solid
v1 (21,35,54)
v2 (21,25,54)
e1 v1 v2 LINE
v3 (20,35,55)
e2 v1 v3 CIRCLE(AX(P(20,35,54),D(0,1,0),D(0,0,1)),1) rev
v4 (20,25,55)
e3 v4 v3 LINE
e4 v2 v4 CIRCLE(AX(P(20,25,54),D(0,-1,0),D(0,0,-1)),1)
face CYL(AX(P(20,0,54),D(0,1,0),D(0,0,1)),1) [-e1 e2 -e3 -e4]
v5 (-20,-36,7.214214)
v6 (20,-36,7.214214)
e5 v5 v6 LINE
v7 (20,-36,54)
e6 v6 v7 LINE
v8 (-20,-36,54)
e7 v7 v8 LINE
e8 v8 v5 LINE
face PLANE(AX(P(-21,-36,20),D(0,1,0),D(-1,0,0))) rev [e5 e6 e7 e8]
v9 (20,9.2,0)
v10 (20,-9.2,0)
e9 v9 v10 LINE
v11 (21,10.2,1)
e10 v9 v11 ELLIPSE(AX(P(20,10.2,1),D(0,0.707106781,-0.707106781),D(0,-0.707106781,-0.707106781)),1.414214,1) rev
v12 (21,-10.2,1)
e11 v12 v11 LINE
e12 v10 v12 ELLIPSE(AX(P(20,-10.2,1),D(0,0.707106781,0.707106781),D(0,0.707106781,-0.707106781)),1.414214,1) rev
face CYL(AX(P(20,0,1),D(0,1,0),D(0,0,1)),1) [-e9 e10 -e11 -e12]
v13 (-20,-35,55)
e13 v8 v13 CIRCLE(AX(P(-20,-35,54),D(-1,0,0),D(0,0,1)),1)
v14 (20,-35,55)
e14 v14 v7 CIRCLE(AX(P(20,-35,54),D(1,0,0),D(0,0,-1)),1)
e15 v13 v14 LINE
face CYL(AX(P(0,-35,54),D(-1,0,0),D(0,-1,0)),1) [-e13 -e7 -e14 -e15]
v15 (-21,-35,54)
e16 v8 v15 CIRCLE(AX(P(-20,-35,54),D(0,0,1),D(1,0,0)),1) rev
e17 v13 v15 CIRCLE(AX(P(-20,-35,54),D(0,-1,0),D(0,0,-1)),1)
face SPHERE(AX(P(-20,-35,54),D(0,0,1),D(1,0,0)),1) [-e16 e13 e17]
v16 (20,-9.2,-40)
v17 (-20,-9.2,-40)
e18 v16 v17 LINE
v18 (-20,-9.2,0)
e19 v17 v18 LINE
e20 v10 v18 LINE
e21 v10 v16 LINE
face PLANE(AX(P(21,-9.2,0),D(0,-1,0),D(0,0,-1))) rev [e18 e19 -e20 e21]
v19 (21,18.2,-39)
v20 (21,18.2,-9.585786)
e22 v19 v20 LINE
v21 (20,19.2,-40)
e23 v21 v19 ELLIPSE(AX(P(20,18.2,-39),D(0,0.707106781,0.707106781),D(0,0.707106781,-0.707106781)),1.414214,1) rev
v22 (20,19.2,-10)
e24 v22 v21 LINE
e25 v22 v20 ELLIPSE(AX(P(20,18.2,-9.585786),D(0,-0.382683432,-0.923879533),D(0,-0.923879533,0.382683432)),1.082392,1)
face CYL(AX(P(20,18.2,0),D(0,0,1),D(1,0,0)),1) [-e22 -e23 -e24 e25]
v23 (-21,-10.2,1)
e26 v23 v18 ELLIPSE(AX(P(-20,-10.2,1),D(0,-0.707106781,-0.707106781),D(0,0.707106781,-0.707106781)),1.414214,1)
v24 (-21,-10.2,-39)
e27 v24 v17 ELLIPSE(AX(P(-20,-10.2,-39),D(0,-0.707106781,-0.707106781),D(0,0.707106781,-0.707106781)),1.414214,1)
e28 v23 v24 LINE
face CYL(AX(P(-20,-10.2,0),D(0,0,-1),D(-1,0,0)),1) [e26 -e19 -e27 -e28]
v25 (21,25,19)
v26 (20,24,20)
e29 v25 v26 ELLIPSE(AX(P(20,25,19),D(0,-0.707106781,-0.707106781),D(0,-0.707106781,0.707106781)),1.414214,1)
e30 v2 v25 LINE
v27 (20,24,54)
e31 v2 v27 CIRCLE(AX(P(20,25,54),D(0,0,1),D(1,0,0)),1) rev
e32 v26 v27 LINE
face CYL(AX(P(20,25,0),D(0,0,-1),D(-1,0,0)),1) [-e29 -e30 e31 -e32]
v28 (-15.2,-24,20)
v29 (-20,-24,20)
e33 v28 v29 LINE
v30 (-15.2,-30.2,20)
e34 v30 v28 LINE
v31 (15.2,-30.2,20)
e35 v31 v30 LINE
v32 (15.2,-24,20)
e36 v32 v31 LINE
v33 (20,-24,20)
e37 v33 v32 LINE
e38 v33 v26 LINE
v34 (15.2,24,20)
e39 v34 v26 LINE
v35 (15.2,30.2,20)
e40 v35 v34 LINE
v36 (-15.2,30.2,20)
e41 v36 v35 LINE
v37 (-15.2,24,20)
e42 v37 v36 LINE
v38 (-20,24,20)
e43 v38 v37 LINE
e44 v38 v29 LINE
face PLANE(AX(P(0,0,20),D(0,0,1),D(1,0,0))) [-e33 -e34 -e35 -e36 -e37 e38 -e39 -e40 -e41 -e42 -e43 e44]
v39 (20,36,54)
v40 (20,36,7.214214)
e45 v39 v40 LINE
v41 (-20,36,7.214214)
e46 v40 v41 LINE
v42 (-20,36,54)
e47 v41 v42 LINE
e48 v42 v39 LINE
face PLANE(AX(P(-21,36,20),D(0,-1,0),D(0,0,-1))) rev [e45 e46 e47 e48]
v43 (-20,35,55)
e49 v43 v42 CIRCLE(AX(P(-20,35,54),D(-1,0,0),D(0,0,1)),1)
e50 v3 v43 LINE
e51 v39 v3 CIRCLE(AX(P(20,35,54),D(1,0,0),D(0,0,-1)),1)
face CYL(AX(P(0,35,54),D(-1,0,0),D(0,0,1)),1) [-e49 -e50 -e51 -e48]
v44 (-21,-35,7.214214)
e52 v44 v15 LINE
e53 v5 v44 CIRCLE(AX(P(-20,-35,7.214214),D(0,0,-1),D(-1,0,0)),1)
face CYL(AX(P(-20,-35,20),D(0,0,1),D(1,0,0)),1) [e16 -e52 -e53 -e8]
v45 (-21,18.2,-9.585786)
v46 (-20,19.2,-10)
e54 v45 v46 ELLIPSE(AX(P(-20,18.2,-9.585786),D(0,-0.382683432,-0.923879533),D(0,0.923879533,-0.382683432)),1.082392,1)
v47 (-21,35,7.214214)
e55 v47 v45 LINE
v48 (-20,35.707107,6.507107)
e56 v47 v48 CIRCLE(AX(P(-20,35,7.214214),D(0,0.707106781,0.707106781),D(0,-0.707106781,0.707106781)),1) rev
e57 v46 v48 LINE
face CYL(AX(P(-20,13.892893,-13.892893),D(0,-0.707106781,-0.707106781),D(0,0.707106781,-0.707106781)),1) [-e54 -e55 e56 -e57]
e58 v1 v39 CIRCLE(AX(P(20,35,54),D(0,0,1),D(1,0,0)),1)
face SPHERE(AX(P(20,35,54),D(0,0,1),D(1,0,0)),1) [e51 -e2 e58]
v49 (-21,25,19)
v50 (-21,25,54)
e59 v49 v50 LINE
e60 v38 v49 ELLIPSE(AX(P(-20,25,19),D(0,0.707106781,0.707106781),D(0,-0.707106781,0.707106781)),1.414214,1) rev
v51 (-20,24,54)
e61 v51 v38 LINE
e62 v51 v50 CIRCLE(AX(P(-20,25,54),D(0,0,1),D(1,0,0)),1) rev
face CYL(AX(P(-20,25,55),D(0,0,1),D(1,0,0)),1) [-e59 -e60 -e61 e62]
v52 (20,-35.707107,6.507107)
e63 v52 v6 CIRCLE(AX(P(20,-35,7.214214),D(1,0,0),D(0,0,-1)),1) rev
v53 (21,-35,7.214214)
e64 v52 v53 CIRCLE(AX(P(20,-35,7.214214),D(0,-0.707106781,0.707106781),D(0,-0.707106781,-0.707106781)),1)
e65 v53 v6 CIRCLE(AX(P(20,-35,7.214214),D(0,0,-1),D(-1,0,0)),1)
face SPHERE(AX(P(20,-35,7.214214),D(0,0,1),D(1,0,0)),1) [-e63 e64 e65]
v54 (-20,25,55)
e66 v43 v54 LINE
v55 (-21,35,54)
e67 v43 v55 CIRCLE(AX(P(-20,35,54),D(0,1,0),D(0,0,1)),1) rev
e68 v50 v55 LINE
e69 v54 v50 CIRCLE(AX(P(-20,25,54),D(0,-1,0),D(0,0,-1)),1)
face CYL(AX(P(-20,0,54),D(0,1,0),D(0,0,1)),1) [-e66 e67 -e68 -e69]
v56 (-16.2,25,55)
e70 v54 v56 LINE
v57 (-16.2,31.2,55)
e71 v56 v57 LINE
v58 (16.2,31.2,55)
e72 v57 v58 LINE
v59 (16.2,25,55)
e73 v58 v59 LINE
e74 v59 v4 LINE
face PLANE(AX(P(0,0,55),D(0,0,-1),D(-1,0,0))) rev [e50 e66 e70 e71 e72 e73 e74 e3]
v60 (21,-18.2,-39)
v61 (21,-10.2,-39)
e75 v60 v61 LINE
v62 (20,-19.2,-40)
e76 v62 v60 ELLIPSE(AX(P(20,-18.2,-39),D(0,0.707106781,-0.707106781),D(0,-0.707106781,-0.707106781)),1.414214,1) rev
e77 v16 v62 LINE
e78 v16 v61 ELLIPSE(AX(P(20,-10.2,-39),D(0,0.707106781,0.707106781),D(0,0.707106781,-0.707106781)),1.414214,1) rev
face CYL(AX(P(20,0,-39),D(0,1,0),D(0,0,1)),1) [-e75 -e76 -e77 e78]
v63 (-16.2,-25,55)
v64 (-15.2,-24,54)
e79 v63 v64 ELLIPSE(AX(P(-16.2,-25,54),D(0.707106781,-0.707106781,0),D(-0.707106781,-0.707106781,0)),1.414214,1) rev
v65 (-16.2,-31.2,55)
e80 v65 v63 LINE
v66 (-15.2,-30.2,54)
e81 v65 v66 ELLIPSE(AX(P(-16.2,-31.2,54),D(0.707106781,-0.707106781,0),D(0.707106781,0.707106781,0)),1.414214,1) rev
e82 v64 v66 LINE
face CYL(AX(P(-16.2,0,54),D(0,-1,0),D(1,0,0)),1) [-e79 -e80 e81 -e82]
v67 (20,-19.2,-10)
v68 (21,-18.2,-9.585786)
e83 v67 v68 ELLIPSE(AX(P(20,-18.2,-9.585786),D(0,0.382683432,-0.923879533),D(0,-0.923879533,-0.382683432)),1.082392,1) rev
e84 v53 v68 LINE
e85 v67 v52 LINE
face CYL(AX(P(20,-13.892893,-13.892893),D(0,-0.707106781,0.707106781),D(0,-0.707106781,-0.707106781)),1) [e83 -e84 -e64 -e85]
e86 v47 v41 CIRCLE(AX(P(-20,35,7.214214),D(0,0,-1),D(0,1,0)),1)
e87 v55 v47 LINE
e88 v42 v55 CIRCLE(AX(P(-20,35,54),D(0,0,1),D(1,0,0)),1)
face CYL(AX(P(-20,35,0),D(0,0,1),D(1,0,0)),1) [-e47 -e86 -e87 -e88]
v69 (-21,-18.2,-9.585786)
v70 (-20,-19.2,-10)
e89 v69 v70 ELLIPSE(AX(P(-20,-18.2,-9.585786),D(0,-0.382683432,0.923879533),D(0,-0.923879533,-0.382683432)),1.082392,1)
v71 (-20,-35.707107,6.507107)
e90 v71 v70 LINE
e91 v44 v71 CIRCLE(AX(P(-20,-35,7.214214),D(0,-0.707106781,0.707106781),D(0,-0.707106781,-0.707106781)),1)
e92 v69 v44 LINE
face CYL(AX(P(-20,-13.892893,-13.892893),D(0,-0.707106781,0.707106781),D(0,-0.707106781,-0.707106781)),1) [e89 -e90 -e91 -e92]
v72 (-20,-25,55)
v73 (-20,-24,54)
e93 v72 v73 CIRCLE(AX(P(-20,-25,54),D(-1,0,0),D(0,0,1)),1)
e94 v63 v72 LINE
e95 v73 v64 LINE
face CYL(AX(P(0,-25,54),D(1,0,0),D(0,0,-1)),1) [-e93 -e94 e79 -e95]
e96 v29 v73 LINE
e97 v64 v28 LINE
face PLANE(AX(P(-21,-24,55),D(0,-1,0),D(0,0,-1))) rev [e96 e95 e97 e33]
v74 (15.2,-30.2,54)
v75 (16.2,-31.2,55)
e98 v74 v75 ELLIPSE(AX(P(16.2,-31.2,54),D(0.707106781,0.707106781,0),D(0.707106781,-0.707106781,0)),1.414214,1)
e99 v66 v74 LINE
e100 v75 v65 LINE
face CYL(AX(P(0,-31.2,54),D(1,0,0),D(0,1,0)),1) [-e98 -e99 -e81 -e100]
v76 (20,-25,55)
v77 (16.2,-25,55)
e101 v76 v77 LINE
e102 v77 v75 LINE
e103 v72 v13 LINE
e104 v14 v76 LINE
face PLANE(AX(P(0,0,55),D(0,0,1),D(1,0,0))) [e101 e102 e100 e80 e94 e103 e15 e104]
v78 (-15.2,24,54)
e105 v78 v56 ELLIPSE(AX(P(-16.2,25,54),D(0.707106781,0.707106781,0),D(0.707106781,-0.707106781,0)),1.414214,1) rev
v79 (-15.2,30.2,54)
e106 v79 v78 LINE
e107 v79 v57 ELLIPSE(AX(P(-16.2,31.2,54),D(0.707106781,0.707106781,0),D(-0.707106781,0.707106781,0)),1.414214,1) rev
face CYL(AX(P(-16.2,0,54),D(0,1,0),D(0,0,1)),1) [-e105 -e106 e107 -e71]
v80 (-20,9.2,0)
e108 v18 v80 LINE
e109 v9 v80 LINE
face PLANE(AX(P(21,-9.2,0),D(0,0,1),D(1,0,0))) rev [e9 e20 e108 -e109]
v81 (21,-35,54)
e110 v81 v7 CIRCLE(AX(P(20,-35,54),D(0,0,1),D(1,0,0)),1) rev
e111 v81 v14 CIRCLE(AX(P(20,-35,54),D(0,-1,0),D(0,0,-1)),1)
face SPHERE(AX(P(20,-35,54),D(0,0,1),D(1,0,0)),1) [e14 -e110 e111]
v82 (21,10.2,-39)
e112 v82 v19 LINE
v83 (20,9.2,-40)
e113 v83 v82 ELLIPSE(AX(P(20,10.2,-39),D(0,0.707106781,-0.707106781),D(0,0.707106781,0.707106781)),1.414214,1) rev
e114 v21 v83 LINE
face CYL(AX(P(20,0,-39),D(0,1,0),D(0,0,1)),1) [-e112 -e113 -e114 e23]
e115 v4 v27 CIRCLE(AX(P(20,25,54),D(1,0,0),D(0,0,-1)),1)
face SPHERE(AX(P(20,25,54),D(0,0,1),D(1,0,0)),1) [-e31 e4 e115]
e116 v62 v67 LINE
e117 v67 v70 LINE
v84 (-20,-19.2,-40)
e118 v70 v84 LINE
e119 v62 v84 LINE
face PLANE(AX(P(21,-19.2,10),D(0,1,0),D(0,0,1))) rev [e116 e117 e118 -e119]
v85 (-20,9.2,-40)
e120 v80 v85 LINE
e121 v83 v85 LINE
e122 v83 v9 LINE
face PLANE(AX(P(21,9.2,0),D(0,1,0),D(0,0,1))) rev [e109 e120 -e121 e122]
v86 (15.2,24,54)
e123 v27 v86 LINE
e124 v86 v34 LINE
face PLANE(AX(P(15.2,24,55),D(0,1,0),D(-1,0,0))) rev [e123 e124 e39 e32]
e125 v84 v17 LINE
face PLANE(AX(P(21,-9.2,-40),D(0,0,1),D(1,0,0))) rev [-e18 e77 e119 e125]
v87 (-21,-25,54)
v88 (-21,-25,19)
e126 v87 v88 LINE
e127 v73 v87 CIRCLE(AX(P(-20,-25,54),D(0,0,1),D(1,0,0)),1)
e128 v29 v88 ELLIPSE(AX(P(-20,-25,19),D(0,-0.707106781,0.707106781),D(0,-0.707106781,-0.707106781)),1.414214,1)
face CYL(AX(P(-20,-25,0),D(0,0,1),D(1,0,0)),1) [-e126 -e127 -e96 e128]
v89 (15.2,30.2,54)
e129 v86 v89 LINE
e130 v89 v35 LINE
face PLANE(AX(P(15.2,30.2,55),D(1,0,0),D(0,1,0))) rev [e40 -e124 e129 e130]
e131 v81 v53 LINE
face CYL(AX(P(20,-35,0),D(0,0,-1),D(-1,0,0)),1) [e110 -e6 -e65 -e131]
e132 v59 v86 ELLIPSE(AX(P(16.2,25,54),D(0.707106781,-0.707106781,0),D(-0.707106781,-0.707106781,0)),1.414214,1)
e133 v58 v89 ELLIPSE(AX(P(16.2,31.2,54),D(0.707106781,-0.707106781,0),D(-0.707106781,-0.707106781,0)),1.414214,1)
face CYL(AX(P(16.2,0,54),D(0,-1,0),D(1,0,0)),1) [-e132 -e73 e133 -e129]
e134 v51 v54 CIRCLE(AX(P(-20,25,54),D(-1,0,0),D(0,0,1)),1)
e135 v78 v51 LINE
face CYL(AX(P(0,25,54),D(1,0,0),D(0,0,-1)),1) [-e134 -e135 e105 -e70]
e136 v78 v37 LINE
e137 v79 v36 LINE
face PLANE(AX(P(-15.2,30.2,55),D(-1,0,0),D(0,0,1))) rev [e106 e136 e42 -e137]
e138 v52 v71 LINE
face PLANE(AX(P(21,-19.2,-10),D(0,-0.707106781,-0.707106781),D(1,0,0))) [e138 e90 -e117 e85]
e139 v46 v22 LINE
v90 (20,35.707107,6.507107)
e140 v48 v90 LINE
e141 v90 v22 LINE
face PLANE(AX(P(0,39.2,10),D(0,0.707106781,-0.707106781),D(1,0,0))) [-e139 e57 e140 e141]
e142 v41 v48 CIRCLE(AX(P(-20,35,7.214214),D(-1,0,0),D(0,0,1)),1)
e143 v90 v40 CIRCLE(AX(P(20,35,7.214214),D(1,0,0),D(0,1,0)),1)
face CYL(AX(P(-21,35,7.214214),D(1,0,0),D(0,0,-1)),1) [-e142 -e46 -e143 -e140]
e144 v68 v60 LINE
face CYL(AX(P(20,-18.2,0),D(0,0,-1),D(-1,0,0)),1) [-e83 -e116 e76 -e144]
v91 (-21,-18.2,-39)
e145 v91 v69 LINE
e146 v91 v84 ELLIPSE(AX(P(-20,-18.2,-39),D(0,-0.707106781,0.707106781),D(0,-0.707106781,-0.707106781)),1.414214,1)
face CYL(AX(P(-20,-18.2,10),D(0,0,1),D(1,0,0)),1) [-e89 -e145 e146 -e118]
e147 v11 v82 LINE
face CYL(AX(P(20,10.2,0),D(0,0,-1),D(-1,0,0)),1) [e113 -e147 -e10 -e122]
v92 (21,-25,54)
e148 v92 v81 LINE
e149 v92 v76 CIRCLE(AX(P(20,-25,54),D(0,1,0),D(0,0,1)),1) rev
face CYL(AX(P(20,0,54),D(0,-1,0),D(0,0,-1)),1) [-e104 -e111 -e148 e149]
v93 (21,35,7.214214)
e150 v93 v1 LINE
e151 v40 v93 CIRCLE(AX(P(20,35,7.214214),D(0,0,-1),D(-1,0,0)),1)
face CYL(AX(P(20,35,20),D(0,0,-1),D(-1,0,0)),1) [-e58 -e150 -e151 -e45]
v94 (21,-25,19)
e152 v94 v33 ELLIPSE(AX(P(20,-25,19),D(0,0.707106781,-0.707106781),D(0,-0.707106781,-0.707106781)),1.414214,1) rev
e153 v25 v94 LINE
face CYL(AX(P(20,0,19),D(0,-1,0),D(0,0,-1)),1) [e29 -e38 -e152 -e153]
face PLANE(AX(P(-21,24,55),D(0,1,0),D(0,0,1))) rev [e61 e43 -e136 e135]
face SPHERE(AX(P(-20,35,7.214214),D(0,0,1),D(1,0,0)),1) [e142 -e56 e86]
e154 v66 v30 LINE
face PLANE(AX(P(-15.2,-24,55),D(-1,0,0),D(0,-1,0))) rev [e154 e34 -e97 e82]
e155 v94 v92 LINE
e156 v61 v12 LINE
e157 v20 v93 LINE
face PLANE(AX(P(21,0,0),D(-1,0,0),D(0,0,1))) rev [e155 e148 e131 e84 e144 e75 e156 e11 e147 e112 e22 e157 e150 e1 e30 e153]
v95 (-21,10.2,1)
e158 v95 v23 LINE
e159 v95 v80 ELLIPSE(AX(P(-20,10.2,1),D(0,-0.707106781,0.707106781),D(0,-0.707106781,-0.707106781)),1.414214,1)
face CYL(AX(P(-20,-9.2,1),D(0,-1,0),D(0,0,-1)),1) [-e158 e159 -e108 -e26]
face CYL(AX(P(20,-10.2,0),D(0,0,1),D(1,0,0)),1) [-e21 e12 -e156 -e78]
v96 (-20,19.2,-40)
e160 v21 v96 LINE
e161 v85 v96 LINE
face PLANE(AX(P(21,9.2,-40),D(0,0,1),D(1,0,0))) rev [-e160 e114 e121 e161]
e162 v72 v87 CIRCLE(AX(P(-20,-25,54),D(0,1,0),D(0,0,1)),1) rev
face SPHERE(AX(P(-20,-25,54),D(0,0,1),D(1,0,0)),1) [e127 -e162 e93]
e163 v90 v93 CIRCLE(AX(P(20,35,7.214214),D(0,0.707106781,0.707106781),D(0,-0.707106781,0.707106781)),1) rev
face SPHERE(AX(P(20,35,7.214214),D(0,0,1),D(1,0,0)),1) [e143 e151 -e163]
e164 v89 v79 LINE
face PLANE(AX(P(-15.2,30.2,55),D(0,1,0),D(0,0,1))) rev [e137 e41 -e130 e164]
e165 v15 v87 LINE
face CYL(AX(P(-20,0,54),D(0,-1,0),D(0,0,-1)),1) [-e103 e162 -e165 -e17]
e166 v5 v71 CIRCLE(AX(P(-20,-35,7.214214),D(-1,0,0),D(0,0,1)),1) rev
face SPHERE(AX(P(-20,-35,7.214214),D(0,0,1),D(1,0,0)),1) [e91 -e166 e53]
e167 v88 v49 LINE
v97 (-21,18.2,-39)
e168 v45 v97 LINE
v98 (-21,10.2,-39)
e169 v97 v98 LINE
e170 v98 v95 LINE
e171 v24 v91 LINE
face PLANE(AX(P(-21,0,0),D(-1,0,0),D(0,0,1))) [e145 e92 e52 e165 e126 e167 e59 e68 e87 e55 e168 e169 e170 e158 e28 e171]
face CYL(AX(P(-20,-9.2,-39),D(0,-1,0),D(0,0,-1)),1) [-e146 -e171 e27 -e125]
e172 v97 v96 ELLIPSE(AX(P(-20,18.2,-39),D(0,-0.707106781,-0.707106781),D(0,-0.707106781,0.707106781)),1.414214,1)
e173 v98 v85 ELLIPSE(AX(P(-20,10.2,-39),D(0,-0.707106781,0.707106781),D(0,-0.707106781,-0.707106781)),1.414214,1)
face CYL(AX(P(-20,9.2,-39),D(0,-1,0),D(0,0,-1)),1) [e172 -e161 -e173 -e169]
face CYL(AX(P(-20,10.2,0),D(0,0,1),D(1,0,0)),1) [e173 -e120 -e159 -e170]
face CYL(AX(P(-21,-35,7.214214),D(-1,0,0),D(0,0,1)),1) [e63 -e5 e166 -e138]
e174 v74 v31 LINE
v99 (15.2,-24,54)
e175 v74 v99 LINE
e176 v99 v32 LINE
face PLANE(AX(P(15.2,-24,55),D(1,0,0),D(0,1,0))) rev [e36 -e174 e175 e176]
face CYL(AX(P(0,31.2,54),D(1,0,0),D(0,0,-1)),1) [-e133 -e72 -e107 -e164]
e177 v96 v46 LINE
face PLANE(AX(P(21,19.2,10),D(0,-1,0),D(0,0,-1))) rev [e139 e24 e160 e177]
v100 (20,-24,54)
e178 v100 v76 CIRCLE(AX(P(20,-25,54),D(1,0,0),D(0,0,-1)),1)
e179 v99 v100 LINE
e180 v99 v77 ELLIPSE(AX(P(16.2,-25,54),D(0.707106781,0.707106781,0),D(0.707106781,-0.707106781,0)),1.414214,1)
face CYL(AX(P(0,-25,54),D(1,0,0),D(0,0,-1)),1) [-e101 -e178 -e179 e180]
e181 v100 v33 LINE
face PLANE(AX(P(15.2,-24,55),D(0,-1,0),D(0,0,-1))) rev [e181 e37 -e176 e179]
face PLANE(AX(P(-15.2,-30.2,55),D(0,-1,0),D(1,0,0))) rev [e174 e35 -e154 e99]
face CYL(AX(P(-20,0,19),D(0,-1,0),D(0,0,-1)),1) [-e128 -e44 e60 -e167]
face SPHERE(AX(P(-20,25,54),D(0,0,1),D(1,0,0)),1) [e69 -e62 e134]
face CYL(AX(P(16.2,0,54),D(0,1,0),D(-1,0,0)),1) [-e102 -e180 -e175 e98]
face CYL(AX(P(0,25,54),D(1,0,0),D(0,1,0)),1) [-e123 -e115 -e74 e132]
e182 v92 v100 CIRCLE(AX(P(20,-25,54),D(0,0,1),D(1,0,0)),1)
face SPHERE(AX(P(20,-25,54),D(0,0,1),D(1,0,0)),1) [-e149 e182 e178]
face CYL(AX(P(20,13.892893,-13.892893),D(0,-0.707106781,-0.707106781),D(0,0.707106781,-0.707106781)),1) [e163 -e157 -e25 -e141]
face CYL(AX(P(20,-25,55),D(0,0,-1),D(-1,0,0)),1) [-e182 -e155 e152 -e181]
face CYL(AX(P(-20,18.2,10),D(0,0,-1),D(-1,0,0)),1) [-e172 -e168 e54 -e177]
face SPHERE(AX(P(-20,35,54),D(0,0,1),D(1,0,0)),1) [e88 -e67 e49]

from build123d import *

# Parameters (mm, degrees)
BOSS_EXTRUDE1_DEPTH = 21
SKETCH2_W           = 42
SKETCH2_H           = 72
BOSS_EXTRUDE2_DEPTH = 10
BOSS_EXTRUDE3_DEPTH = 35
CHAMFER1_SIZE       = 20
FILLET1_R           = 1


with BuildPart() as part:
    # Sketch1 → Boss-Extrude1 (new, symmetric)
    with BuildSketch(Plane(origin=(0, 0, 0), x_dir=(0, 0, -1), z_dir=(1, 0, 0))):
        Polygon((0, -9.2), (0, 9.2), (40, 9.2), (40, 19.2), (-10, 19.2), (-10, -19.2), (40, -19.2), (40, -9.2), align=None)
    extrude(amount=BOSS_EXTRUDE1_DEPTH, both=True)

    # Sketch2 → Boss-Extrude2 (add)
    with BuildSketch(Plane.XY.offset(10)):
        Rectangle(SKETCH2_W, SKETCH2_H)
    extrude(amount=BOSS_EXTRUDE2_DEPTH)

    # Sketch3 → Boss-Extrude3 (add)
    with BuildSketch(Plane.XY.offset(20)):
        Polygon((-15.2, 30.2), (-15.2, 24), (-21, 24), (-21, 36), (21, 36), (21, 24), (15.2, 24), (15.2, 30.2), align=None)
        Polygon((-15.2, -30.2), (15.2, -30.2), (15.2, -24), (21, -24), (21, -36), (-21, -36), (-21, -24), (-15.2, -24), align=None)
    extrude(amount=BOSS_EXTRUDE3_DEPTH)

    # Chamfer1
    # the kernel refuses this chamfer: 20 mm, written as the material it adds along each edge
    with BuildSketch(Plane(origin=(-21, -19.2, 10), x_dir=(0, 0.027495876610586317, -0.9996219169112968), z_dir=(1, 0, 0))) as chamfer1_piece_1_section:
        Polygon((CHAMFER1_SIZE * 0.999621916911, -CHAMFER1_SIZE * 0.0274958766106), (-CHAMFER1_SIZE * 0.0274958766106, -CHAMFER1_SIZE * 0.999621916911), (0, 0), align=None)
    chamfer1_piece_1 = extrude(amount=42, mode=Mode.PRIVATE)
    chamfer1_piece_1 = split(chamfer1_piece_1, bisect_by=Plane(origin=(0, -36, 3.17327651), z_dir=(0, 1, 0)), keep=Keep.TOP, mode=Mode.PRIVATE)
    add(chamfer1_piece_1)
    with BuildSketch(Plane(origin=(-21, 19.2, 10), x_dir=(0, 0.9996219169112968, 0.027495876610586403), z_dir=(1, 0, 0))) as chamfer1_piece_2_section:
        Polygon((CHAMFER1_SIZE * 0.999621916911, -CHAMFER1_SIZE * 0.0274958766106), (-CHAMFER1_SIZE * 0.0274958766106, -CHAMFER1_SIZE * 0.999621916911), (0, 0), align=None)
    chamfer1_piece_2 = extrude(amount=42, mode=Mode.PRIVATE)
    chamfer1_piece_2 = split(chamfer1_piece_2, bisect_by=Plane(origin=(0, 36, 3.17327651), z_dir=(0, -1, 0)), keep=Keep.TOP, mode=Mode.PRIVATE)
    add(chamfer1_piece_2)

    # Fillet1
    fillet1_edges = [part.edges().sort_by_distance(p)[0] for p in [
        (-21, 19.2, -25),
        (-21, 14.2, -40),
        (21, -14.2, -40),
        (21, -9.2, -20),
        (-21, 36, 30.9),
        (-21, -36, 30.9),
        (21, -36, 30.9),
        (21, 36, 30.9),
        (21, 0, 0),
        (21, 9.2, -20),
        (-21, 0, 20),
        (21, 24, 37.5),
        (-21, 24, 37.5),
        (0, 30.2, 55),
        (15.2, 27.1, 55),
        (18.1, 24, 55),
        (21, 30, 55),
        (0, 36, 55),
        (-21, 30, 55),
        (-18.1, 24, 55),
        (-15.2, 27.1, 55),
        (21, 14.2, -40),
        (21, 0, 20),
        (-21, -24, 37.5),
        (21, -24, 37.5),
        (-15.2, -27.1, 55),
        (-18.1, -24, 55),
        (-21, -30, 55),
        (0, -36, 55),
        (21, -30, 55),
        (18.1, -24, 55),
        (15.2, -27.1, 55),
        (0, -30.2, 55),
        (-21, -19.2, -25),
        (21, -19.2, -25),
        (-21, -27.6, -1.6),
        (0, -36, 6.8),
        (21, -27.6, -1.6),
        (-21, 9.2, -20),
        (0, 36, 6.8),
        (-21, 27.6, -1.6),
        (21, 27.6, -1.6),
        (21, 19.2, -25),
        (-21, 0, 0),
        (-21, -9.2, -20),
        (-21, -14.2, -40),
    ]]
    fillet(fillet1_edges, radius=FILLET1_R)


solid = part.part
